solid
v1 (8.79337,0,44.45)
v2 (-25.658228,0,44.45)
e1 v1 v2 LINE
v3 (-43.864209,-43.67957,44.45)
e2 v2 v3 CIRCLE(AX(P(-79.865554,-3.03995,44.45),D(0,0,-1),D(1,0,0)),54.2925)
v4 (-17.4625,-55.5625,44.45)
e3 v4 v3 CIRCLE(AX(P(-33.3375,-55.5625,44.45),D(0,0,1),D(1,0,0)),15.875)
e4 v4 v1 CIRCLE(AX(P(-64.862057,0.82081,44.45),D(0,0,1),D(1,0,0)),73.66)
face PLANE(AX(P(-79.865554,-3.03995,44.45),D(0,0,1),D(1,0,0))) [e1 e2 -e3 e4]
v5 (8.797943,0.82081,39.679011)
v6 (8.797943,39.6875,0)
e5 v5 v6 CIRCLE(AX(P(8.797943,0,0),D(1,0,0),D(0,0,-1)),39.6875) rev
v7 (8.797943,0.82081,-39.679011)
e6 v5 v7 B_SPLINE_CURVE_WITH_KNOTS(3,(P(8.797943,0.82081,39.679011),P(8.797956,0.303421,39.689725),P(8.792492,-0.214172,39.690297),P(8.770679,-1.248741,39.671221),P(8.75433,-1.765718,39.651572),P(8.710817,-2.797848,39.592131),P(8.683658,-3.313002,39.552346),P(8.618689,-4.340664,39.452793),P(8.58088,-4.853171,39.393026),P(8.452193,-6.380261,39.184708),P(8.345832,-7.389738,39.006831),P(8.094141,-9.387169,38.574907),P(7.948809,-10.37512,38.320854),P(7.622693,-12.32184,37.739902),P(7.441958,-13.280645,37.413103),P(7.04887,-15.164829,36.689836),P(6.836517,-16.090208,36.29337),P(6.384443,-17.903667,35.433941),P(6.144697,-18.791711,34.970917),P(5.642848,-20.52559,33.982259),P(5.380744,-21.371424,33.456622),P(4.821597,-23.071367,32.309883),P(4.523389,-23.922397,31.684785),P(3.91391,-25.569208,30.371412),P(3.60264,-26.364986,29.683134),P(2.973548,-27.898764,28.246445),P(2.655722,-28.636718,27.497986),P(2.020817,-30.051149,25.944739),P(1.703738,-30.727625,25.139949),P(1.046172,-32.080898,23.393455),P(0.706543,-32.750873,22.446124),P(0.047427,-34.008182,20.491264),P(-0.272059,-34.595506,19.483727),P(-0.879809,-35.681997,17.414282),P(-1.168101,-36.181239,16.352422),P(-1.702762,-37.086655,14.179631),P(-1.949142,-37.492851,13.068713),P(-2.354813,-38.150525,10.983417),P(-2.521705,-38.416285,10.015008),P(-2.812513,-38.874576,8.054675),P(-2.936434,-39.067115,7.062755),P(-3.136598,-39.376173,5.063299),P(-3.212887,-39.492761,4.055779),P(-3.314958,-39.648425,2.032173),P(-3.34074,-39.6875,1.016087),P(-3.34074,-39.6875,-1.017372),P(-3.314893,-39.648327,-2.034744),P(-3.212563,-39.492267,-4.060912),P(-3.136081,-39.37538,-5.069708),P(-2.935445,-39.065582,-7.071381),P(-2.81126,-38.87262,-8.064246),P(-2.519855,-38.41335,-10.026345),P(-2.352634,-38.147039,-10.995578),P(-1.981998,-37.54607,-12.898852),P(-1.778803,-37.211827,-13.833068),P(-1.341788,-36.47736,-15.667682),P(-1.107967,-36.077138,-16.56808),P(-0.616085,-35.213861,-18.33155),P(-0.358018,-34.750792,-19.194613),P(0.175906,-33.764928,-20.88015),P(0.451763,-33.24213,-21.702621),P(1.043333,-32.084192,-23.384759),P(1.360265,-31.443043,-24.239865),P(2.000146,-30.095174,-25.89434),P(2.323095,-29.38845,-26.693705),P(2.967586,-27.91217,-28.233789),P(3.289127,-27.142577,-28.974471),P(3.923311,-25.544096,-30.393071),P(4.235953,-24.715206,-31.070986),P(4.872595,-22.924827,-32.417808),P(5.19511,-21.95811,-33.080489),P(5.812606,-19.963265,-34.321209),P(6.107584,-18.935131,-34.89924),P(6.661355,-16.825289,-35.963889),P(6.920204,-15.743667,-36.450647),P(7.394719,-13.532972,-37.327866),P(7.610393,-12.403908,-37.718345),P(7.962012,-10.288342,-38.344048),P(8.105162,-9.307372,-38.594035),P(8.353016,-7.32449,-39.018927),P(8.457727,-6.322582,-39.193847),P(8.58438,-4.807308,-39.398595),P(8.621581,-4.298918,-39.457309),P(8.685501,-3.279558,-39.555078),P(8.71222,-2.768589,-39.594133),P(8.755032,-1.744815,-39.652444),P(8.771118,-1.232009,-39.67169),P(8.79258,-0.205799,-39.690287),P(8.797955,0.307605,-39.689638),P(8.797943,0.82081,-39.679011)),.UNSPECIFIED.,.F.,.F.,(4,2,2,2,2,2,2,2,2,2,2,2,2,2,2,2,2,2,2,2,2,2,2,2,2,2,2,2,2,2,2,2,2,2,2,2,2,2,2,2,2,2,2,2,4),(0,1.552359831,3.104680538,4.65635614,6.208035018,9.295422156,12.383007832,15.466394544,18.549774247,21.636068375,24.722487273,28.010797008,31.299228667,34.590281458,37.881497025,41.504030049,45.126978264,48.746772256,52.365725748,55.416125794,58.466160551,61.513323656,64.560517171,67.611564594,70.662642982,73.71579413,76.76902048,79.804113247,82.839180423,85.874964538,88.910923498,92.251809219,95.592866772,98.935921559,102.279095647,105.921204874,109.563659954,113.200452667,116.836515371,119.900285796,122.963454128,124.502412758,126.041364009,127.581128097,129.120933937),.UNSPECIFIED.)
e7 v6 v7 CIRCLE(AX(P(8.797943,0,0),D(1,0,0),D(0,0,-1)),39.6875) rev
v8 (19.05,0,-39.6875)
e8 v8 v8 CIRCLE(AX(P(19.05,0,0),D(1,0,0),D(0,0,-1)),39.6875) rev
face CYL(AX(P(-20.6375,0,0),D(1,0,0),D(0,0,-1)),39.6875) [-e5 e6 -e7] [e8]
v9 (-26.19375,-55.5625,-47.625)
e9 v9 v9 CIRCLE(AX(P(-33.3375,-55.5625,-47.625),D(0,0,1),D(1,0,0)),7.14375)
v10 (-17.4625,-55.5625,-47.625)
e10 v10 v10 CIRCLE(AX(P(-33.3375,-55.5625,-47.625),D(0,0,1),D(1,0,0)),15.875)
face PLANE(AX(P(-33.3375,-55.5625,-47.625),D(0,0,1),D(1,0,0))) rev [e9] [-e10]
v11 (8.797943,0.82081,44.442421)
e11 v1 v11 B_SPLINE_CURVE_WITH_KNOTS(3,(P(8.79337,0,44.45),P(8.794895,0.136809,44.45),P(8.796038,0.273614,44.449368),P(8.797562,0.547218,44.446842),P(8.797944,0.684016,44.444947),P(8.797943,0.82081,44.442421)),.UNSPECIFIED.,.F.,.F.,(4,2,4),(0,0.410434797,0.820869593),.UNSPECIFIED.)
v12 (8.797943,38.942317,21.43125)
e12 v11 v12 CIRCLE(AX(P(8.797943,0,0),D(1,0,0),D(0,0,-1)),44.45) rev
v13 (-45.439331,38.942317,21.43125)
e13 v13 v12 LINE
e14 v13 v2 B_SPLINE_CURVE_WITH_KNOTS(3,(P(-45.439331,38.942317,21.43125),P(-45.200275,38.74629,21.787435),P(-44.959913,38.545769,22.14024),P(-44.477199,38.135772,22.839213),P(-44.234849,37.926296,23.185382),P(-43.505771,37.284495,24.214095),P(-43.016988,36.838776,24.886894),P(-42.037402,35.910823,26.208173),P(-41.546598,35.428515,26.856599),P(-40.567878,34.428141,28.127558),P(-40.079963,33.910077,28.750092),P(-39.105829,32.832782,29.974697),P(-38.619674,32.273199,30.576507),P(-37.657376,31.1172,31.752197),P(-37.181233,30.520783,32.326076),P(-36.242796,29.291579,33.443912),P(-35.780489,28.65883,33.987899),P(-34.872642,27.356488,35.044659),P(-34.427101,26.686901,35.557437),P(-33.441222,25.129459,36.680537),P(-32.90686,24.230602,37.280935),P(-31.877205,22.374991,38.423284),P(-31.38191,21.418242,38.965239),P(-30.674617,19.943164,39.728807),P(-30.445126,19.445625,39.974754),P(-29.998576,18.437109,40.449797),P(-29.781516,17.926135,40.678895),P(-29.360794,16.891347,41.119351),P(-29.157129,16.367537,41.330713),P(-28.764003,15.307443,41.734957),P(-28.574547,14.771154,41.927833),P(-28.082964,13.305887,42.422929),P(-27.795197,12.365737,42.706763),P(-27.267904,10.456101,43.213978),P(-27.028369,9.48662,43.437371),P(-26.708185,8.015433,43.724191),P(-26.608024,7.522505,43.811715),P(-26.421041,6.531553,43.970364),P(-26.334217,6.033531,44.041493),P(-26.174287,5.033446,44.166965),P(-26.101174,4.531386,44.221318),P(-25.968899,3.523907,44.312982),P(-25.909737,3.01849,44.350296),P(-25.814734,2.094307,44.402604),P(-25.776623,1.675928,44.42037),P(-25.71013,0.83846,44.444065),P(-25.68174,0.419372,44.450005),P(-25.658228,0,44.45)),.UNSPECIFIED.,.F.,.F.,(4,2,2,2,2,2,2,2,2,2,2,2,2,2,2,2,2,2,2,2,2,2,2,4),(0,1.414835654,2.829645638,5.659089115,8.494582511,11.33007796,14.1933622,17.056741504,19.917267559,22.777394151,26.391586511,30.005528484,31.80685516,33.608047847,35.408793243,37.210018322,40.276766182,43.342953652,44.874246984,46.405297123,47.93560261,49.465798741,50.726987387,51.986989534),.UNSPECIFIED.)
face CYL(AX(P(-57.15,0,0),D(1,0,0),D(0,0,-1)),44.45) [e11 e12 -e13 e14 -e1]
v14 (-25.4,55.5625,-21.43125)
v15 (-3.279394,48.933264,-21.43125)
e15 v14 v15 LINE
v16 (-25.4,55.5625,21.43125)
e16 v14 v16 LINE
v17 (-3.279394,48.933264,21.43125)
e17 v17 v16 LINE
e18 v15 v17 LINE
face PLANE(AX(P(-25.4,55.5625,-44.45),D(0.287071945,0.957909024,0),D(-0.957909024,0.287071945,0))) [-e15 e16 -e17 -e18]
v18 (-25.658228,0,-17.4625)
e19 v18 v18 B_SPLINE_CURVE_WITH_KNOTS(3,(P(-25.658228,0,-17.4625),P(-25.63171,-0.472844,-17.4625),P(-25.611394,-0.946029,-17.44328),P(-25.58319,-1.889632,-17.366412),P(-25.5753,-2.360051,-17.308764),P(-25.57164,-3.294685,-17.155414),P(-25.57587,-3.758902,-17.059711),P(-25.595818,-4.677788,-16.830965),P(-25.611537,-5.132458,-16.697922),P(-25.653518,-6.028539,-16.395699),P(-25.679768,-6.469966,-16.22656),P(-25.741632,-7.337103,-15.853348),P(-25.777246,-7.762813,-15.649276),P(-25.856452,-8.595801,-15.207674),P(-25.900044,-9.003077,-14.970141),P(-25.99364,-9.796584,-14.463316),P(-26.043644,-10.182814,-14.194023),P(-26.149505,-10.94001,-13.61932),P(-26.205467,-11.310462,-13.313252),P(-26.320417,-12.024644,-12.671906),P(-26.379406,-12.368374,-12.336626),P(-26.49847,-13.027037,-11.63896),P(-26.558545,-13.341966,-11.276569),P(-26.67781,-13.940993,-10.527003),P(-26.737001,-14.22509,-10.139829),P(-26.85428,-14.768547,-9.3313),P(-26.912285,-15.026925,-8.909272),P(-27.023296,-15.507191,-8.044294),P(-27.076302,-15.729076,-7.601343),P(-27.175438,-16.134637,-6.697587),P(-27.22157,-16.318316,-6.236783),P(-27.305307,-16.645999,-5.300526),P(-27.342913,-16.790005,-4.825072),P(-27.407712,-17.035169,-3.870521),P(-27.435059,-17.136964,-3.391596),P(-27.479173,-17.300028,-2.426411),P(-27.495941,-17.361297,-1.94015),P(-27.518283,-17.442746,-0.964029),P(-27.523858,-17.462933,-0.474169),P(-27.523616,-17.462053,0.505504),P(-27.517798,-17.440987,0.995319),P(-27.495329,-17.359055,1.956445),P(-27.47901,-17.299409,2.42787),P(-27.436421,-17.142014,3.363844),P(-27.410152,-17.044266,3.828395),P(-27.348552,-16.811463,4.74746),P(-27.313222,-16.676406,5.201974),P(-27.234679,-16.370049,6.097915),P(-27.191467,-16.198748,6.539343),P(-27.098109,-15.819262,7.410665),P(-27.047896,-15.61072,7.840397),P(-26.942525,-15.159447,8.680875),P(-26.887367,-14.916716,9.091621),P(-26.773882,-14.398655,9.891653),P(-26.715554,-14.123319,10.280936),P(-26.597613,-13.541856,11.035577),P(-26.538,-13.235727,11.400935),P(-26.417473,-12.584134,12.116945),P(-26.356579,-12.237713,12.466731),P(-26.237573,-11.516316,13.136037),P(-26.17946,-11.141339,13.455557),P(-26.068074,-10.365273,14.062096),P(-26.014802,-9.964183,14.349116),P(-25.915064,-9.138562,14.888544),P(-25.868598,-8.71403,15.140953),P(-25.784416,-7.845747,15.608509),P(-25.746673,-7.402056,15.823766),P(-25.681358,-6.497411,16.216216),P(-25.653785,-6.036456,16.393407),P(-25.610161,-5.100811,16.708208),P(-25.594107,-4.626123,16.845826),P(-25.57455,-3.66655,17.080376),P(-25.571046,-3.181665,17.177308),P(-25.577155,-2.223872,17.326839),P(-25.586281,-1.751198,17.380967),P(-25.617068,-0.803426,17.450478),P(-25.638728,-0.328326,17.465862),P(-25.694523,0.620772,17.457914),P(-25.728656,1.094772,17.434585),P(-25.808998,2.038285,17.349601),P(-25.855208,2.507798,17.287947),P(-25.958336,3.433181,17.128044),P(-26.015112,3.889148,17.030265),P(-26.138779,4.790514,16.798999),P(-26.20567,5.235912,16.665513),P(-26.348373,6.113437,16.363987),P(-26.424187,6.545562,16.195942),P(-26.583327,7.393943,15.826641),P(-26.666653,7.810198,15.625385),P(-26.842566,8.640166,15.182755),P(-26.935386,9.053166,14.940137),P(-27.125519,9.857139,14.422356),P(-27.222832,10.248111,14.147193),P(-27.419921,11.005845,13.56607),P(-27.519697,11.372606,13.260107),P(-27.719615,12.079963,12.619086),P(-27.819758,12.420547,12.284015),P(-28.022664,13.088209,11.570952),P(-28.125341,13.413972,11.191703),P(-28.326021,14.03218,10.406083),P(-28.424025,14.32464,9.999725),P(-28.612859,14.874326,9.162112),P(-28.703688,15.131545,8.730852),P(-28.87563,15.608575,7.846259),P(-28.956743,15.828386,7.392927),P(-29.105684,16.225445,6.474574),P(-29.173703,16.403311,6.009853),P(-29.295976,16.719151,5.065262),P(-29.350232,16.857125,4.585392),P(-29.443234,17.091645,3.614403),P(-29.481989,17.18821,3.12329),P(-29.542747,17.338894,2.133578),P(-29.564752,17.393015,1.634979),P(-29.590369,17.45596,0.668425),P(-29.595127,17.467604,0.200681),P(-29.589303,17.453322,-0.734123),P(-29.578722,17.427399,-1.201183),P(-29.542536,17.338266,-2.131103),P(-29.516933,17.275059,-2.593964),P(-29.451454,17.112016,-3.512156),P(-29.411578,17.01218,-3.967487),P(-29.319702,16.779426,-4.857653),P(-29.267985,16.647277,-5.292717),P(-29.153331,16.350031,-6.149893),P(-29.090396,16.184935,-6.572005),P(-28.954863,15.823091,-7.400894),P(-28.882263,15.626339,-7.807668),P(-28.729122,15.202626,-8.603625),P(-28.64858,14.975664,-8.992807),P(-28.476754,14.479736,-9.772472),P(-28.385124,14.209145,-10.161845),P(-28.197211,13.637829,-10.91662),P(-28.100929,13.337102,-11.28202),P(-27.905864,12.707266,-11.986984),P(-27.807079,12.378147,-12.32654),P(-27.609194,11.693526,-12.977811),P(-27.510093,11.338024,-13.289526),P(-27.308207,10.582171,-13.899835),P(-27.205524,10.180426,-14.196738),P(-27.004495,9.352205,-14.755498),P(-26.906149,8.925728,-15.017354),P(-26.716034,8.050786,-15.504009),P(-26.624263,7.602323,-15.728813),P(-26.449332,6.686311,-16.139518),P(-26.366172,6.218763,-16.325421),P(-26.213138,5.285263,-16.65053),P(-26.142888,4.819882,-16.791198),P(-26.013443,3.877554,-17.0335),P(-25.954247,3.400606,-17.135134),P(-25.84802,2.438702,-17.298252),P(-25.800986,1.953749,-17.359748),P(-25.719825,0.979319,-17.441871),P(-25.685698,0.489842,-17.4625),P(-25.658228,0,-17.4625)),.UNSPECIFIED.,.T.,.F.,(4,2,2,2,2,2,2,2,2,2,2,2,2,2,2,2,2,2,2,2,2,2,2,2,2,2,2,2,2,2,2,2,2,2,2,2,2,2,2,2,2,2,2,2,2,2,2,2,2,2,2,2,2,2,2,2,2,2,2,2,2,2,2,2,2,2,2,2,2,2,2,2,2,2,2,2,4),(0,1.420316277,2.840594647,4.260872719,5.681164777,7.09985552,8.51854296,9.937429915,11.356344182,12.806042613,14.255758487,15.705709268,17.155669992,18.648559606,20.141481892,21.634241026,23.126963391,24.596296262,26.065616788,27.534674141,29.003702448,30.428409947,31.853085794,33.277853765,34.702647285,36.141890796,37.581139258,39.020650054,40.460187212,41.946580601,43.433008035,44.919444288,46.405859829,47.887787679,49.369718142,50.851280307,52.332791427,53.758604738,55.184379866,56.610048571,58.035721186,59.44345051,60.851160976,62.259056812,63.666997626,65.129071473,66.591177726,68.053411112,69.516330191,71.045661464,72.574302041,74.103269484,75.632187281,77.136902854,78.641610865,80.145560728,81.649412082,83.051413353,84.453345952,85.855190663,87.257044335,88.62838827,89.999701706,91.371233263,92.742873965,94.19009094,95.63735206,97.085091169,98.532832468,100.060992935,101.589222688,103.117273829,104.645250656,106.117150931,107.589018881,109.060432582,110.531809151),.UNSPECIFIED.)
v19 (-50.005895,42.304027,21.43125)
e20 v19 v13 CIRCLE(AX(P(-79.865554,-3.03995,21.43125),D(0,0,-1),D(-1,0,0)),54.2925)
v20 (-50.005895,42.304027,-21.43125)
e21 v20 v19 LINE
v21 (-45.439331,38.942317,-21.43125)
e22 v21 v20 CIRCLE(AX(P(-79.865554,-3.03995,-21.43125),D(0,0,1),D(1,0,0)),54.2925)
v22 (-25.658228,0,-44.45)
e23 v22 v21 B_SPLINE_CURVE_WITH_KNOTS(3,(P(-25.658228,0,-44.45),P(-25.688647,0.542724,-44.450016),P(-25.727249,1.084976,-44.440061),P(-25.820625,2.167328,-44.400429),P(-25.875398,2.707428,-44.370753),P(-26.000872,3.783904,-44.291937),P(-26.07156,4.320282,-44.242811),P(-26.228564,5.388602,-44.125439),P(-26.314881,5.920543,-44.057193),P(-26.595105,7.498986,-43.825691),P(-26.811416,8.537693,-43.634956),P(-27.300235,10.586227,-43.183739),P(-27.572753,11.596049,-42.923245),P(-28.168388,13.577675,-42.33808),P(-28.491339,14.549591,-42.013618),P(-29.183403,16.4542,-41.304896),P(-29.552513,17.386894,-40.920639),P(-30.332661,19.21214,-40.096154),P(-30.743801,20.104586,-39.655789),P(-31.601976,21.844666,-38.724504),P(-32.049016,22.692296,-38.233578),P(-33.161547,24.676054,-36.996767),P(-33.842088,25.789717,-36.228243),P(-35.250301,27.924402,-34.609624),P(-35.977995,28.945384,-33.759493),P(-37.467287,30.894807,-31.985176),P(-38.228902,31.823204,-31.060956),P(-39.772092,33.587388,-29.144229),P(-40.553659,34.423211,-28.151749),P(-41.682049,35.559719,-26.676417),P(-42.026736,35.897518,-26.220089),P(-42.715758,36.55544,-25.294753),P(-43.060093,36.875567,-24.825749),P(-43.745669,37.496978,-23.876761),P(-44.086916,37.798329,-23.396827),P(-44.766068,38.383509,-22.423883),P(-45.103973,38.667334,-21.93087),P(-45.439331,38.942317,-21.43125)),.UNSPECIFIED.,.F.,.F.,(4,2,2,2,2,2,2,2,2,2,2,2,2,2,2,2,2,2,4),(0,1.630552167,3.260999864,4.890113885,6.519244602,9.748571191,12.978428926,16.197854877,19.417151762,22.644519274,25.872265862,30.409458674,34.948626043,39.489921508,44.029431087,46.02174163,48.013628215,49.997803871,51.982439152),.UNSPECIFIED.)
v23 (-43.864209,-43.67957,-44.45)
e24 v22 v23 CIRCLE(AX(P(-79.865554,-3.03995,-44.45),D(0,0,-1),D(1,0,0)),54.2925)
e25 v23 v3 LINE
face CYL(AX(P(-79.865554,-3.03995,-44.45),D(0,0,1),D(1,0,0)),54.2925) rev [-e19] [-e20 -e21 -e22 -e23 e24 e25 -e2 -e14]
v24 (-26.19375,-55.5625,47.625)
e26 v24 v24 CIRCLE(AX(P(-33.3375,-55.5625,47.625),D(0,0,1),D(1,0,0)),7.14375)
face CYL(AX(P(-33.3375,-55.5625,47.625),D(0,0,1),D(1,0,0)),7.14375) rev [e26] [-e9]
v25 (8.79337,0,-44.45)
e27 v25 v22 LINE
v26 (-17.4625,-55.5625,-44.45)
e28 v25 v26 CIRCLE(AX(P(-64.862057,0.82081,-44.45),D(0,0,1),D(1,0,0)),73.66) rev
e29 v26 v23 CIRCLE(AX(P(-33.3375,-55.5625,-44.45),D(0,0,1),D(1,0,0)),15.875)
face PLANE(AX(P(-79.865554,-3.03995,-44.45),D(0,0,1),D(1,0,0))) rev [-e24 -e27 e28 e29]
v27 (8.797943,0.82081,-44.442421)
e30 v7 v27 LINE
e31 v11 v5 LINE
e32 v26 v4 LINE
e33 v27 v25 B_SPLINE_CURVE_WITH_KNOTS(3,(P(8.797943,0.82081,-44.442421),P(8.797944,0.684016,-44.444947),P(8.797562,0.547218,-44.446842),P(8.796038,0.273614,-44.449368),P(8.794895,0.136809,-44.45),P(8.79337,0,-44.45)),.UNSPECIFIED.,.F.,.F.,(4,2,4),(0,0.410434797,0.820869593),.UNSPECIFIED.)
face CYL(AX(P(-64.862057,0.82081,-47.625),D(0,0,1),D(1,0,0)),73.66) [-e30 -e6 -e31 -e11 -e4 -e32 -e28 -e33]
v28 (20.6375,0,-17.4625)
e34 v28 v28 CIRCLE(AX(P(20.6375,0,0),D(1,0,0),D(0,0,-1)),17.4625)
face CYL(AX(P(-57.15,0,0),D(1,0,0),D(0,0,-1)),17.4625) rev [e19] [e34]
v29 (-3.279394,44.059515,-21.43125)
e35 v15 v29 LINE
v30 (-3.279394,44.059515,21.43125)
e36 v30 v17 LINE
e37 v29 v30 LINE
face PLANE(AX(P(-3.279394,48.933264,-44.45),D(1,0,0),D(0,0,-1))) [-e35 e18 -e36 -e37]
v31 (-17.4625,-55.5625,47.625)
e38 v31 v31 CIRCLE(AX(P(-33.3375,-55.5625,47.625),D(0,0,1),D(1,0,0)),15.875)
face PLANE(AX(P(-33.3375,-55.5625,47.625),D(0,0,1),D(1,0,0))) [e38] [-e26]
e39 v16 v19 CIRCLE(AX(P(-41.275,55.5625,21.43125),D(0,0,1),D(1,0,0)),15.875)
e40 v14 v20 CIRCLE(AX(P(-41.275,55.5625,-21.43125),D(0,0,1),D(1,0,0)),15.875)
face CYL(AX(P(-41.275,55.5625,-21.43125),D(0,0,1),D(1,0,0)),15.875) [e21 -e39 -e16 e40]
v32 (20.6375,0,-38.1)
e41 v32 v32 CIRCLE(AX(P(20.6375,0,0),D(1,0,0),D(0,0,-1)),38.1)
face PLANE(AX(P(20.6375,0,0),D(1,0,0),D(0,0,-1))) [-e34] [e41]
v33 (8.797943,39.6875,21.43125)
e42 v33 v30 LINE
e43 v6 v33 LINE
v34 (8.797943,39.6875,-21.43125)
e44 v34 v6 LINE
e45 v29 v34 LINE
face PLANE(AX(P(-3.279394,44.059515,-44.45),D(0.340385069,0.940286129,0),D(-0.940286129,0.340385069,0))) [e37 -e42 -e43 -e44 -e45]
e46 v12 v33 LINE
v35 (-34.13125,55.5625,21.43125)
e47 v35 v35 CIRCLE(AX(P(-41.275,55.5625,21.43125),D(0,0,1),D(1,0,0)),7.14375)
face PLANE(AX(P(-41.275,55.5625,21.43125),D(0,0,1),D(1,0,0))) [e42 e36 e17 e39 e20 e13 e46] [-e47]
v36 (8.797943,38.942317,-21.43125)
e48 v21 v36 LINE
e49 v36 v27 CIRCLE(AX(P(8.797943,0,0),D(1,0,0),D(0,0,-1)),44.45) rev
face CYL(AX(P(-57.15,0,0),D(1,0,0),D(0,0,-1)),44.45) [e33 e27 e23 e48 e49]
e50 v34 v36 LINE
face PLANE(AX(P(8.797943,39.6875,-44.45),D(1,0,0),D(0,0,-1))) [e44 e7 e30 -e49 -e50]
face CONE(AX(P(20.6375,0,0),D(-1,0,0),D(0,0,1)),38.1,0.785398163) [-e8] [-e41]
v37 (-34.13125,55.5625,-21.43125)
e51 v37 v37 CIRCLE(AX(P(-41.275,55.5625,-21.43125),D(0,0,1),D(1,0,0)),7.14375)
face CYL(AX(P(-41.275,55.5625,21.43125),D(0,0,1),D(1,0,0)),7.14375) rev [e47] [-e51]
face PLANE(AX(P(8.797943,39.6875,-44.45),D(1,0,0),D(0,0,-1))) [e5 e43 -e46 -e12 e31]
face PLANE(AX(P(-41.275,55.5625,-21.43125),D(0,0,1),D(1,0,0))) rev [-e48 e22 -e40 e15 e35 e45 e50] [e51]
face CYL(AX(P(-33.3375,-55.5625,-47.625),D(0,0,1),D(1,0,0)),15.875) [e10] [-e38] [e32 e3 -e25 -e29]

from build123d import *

# Parameters (mm, degrees)
EXTRUDE1_DEPTH                 = 20.6375
EXTRUDE1_DEPTH_BACK            = 20.6375
SKETCH1_R                      = 39.6875
EXTRUDE2_DEPTH                 = 47.625
EXTRUDE2_DEPTH_BACK            = 47.625
SKETCH2_R                      = 15.875
EXTRUDE3_DEPTH                 = 21.43125
EXTRUDE3_DEPTH_BACK            = 21.43125
SKETCH3_R                      = 15.875
EXTRUDE4_DEPTH                 = 44.45
EXTRUDE4_DEPTH_BACK            = 44.45
EXTRUDE5_DEPTH                 = 104.138642279
EXTRUDE5_DEPTH_BACK            = 104.138642279
SKETCH7_R                      = 17.4625
EXTRUDE6_DEPTH                 = 116.854875545
F_9_16_0_5625_DIAMETER_HOLE1_D = 14.2875
F_9_16_0_5625_DIAMETER_HOLE2_D = 14.2875
CHAMFER1_SIZE                  = 1.5875
FILLET1_R                      = 73.66


with BuildPart() as part:
    # Sketch1 → Extrude1 (new, two sides: drawn at the far end of the back side and taken through both)
    with BuildSketch(Plane(origin=(0, 0, 0), x_dir=(0, 0, -1), z_dir=(1, 0, 0)).offset(-EXTRUDE1_DEPTH_BACK)):
        Circle(SKETCH1_R)
    extrude(amount=EXTRUDE1_DEPTH + EXTRUDE1_DEPTH_BACK)



with BuildPart() as body_2:
    # Sketch2 → Extrude2 (new, two sides: drawn at the far end of the back side and taken through both)
    with BuildSketch(Plane.XY.offset(-EXTRUDE2_DEPTH_BACK)):
        with Locations((-33.3375, -55.5625)):
            Circle(SKETCH2_R)
    extrude(amount=EXTRUDE2_DEPTH + EXTRUDE2_DEPTH_BACK)


with BuildPart() as body_3:
    # Sketch3 → Extrude3 (new, two sides: drawn at the far end of the back side and taken through both)
    with BuildSketch(Plane.XY.offset(-EXTRUDE3_DEPTH_BACK)):
        with Locations((-41.275, 55.5625)):
            Circle(SKETCH3_R)
    extrude(amount=EXTRUDE3_DEPTH + EXTRUDE3_DEPTH_BACK)


with BuildPart() as part_1:
    add(part.part)

    add(body_2.part)  # Extrude4 merges body 2

    add(body_3.part)  # Extrude4 merges body 3
    # Sketch4 → Extrude4 (add, two sides: drawn at the far end of the back side and taken through both)
    with BuildSketch(Plane.XY.offset(-EXTRUDE4_DEPTH_BACK)):
        with BuildLine():
            Line((-50.00589462, 42.304027081), (-25.4, 55.5625))
            Line((-25.4, 55.5625), (-3.279393891, 48.933263541))
            Line((-3.279393891, 48.933263541), (-3.279393891, 44.059515259))
            Line((-3.279393891, 44.059515259), (8.797943446, 39.6875))
            Line((8.797943446, 39.6875), (8.797943446, -39.6875))
            Line((8.797943446, -39.6875), (-17.4625, -55.5625))
            Line((-17.4625, -55.5625), (-43.864209099, -43.679570204))
            ThreePointArc((-43.864209099, -43.679570204), (-25.711027758, 0.82823016), (-50.00589462, 42.304027081))
        make_face()
    extrude(amount=EXTRUDE4_DEPTH + EXTRUDE4_DEPTH_BACK)

    # Sketch6 → Extrude5 (cut, two sides: drawn at the far end of the back side and taken through both)
    with BuildSketch(Plane(origin=(0, 0, 0), x_dir=(0, 0, -1), z_dir=(1, 0, 0)).offset(-EXTRUDE5_DEPTH_BACK)):
        with BuildLine():
            Line((-21.43125, 55.5625), (-21.43125, 38.942316616))
            ThreePointArc((-21.43125, 38.942316616), (-38.265007268, 22.618393372), (-44.45, 0))
            Line((-44.45, 0), (-44.45, 55.5625))
            Line((-44.45, 55.5625), (-21.43125, 55.5625))
        make_face()
        with BuildLine():
            Line((21.43125, 55.5625), (21.43125, 38.942316616))
            ThreePointArc((21.43125, 38.942316616), (38.265007268, 22.618393372), (44.45, 0))
            Line((44.45, 0), (44.45, 55.5625))
            Line((44.45, 55.5625), (21.43125, 55.5625))
        make_face()
    extrude(amount=EXTRUDE5_DEPTH + EXTRUDE5_DEPTH_BACK, mode=Mode.SUBTRACT)

    # Sketch7 → Extrude6 (cut, through all)
    with BuildSketch(Plane(origin=(20.6375, 0, 0), x_dir=(0, 0, -1), z_dir=(1, 0, 0))):
        Circle(SKETCH7_R)
    extrude(amount=-EXTRUDE6_DEPTH, mode=Mode.SUBTRACT)

    # 9/16 (0.5625) Diameter Hole1 (through all)
    with Locations(Plane.XY.offset(47.625)):
        with Locations((-33.3375, -55.5625)):
            Hole(F_9_16_0_5625_DIAMETER_HOLE1_D / 2)

    # 9/16 (0.5625) Diameter Hole2 (through all)
    with Locations(Plane.XY.offset(21.43125)):
        with Locations((-41.275, 55.5625)):
            Hole(F_9_16_0_5625_DIAMETER_HOLE2_D / 2)

    # Chamfer1
    chamfer1_edges = [part_1.edges().sort_by_distance(p)[0] for p in [
        (20.6375, 0, 39.6875),
    ]]
    chamfer(chamfer1_edges, length=CHAMFER1_SIZE)

    # Fillet1
    # the kernel refuses this fillet: 73.66 mm, written as the material it takes off along each edge
    with BuildSketch(Plane(origin=(8.797943446, -39.6875, 145.720774821), x_dir=(0, 1, 0), z_dir=(0, 0, -1))) as fillet1_piece_1_section:
        with BuildLine():
            CenterArc((40.508309928, -73.66), FILLET1_R, 90, 49.947360456)
            Line((-15.875, -26.260443446), (0, 0))
            Line((0, 0), (40.508309928, 0))
        make_face()
    fillet1_piece_1 = extrude(amount=145.720774821, mode=Mode.PRIVATE)
    fillet1_piece_1 = fillet1_piece_1 - Plane(origin=(8.797943446, 0, 0), x_dir=(0, 0, -1), z_dir=(-1, 0, 0)) * Cylinder(39.6875, 454, mode=Mode.PRIVATE)
    add(fillet1_piece_1, mode=Mode.SUBTRACT)
    with BuildSketch(Plane(origin=(8.797943446, -39.6875, 0), x_dir=(0, 1, 0), z_dir=(0, 0, -1))) as fillet1_piece_2_section:
        with BuildLine():
            CenterArc((40.508309928, -73.66), FILLET1_R, 90, 49.947360456)
            Line((-15.875, -26.260443446), (0, 0))
            Line((0, 0), (40.508309928, 0))
        make_face()
    fillet1_piece_2 = extrude(amount=145.720774821, mode=Mode.PRIVATE)
    fillet1_piece_2 = fillet1_piece_2 - Plane(origin=(8.797943446, 0, 0), x_dir=(0, 0, -1), z_dir=(-1, 0, 0)) * Cylinder(39.6875, 454, mode=Mode.PRIVATE)
    add(fillet1_piece_2, mode=Mode.SUBTRACT)


solid = part_1.part
